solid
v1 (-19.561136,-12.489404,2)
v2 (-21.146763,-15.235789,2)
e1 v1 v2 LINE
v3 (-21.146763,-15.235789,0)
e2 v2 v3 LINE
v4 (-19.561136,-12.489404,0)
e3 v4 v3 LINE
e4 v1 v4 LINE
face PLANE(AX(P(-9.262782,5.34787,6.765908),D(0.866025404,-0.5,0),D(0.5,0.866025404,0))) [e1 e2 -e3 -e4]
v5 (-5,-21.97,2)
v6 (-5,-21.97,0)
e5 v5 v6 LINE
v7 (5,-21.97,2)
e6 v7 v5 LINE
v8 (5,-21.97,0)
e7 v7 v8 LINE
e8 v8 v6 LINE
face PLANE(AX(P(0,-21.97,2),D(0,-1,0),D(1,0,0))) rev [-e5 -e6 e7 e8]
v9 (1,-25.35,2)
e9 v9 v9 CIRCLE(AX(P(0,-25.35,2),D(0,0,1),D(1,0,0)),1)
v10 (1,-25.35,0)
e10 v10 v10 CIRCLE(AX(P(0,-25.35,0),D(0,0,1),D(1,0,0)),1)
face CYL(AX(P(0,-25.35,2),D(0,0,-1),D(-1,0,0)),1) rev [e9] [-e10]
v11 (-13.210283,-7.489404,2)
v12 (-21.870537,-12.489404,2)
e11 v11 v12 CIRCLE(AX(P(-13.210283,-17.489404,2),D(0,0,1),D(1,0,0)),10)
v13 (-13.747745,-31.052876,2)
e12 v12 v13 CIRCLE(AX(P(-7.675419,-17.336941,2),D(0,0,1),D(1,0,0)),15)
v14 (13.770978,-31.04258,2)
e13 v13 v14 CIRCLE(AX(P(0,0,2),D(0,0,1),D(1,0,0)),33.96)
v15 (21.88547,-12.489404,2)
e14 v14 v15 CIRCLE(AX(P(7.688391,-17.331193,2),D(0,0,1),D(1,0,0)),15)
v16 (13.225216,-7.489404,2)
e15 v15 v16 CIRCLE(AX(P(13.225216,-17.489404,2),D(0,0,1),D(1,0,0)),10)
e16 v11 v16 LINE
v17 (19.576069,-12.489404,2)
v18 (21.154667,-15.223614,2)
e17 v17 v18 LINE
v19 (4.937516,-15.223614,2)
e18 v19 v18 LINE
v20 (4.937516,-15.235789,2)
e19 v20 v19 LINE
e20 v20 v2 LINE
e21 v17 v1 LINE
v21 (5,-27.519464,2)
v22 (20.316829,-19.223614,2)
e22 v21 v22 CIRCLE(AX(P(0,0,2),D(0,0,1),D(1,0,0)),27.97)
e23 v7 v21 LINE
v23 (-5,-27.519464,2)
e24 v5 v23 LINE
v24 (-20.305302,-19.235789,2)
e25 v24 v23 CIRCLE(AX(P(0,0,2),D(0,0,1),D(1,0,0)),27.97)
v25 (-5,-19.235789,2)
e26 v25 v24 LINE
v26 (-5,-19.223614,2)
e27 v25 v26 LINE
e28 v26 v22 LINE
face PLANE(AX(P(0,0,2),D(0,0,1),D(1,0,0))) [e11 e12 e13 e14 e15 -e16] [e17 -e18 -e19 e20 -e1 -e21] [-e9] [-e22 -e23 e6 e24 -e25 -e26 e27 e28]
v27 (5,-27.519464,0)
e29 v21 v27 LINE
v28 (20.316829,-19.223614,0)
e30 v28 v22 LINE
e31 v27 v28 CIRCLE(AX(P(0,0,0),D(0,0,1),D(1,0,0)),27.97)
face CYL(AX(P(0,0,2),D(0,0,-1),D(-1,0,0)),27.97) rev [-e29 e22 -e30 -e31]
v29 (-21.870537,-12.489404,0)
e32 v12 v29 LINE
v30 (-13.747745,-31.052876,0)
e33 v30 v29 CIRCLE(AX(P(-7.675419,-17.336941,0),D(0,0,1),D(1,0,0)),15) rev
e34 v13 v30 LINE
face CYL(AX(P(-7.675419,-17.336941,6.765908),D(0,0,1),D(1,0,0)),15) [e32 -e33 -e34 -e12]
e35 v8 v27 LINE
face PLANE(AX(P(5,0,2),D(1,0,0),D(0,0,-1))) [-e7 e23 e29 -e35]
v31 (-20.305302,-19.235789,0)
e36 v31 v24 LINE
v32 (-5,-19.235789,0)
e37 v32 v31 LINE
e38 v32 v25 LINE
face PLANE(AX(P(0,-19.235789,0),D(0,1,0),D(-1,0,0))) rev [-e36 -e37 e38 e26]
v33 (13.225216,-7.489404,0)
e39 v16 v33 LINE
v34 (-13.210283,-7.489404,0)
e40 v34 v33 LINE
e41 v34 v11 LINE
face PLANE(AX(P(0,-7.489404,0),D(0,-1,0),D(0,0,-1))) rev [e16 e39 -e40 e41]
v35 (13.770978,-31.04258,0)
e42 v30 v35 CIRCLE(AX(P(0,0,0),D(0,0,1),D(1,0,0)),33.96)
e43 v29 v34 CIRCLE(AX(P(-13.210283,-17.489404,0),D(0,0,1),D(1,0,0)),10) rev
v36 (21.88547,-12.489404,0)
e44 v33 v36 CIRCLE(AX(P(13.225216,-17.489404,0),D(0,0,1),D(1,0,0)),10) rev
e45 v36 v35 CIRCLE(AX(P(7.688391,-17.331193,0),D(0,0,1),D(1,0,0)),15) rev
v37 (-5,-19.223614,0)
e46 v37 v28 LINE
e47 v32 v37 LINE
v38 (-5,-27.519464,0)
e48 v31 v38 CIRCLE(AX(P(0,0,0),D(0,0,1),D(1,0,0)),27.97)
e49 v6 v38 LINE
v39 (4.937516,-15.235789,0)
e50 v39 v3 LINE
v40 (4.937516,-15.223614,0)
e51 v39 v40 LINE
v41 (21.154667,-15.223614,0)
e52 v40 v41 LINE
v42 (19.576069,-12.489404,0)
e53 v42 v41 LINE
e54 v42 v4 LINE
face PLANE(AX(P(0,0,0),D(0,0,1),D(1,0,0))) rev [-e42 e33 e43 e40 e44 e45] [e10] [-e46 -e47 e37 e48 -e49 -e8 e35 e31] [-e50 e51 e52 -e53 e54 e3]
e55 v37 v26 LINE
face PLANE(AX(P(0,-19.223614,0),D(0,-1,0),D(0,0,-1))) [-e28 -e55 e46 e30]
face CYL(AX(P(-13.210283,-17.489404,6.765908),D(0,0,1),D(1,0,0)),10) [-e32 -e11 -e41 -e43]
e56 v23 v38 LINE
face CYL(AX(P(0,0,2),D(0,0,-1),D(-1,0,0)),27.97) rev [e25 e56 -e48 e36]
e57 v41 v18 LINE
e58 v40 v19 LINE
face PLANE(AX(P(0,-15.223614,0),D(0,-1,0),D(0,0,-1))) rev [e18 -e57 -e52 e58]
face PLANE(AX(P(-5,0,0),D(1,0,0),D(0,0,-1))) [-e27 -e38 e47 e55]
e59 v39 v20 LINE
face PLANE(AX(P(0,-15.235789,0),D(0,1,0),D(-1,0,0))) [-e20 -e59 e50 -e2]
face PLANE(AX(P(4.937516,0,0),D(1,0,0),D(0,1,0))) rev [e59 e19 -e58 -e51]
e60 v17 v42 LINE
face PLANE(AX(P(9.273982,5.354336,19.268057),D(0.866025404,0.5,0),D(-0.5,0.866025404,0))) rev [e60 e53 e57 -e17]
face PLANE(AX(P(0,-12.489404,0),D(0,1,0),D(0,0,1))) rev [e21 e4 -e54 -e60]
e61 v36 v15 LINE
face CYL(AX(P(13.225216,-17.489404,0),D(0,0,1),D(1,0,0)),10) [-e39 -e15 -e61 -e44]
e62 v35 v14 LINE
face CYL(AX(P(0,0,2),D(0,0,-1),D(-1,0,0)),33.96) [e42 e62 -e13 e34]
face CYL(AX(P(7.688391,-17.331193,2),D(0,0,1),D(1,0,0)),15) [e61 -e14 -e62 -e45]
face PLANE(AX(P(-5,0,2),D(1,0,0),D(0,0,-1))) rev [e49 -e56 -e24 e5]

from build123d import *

# Parameters (mm, degrees)
SKETCH1_R           = 0.9999999999999973
BOSS_EXTRUDE1_DEPTH = 2
BOSS_EXTRUDE2_DEPTH = 2
BOSS_EXTRUDE3_DEPTH = 2
BOSS_EXTRUDE4_DEPTH = 2
BOSS_EXTRUDE6_DEPTH = 2
CUT_EXTRUDE5_DEPTH  = 10
CUT_EXTRUDE6_DEPTH  = 10
FILLET3_R           = 10
FILLET4_R           = 15


with BuildPart() as part:
    # Sketch1 → Boss-Extrude1 (new body)
    with BuildSketch(Plane.XY):
        with BuildLine():
            Line((-25.026699742262835, -12.489403509000002), (-31.579999999831756, -12.489403509000002))
            ThreePointArc((-31.579999999831788, -12.489403509000118), (-4.3876e-13, -33.96), (31.579999999831465, -12.489403509000935))
            Line((31.579999999831173, -12.489403509000002), (25.026699742262835, -12.489403509000002))
            ThreePointArc((25.026699742262835, -12.489403508999999), (16.78917371704707, -22.3706179149977), (5.000000000000879, -27.51946402094327))
            Line((5.000000000000001, -27.519464020943122), (5.000000000000001, -21.97))
            Line((5.000000000000001, -21.97), (0, -21.97))
            Line((0, -21.97), (-5.000000000000001, -21.970000000000002))
            Line((-5.000000000000001, -21.970000000000002), (-5.000000000000001, -27.519464020943126))
            ThreePointArc((-5.000000000000872, -27.519464020943275), (-16.789173717047063, -22.370617914997695), (-25.02669974226283, -12.489403508999999))
        make_face()
        with Locations((2.25e-15, -25.35)):
            Circle(SKETCH1_R, mode=Mode.SUBTRACT)
    extrude(amount=BOSS_EXTRUDE1_DEPTH)

    # Sketch2 → Boss-Extrude2 (add)
    with BuildSketch(Plane.XY.offset(2)):
        with BuildLine():
            Line((-31.57999999983184, -12.489403509000002), (-25.026699742262828, -12.489403509000002))
            Line((-25.026699742262828, -12.489403509000002), (0, -12.489403509000002))
            Line((0, -12.489403509000002), (25.026699742262828, -12.489403509000002))
            Line((25.026699742262828, -12.489403509000002), (31.57999999983184, -12.489403509000002))
            ThreePointArc((31.57999999983184, -12.489403509000002), (30.972585231224635, -9.734010611787788), (29.262941504232284, -7.489403509000002))
            Line((29.262941504232288, -7.489403509000003), (-29.262941504232284, -7.489403509000003))
            ThreePointArc((-29.262941504232284, -7.489403509000002), (-30.972585231224635, -9.734010611787788), (-31.57999999983184, -12.489403509000002))
        make_face()
    extrude(amount=-BOSS_EXTRUDE2_DEPTH)

    # Sketch3 → Boss-Extrude3 (add)
    with BuildSketch(Plane.XY.offset(2)):
        Polygon((-24.813781653352383, -19.23578932070869), (-5, -19.235789320708687), (-5.000000000000001, -19.223614188291315), (25.52831463289919, -19.223614188291315), (25.52831463289919, -15.223614188291313), (4.937516262759692, -15.223614188291313), (4.937516262759691, -15.235789320708687), (-24.813781653352386, -15.235789320708694), align=None)
    extrude(amount=-BOSS_EXTRUDE3_DEPTH)

    # Sketch4 → Boss-Extrude4 (add)
    with BuildSketch(Plane.XY):
        Polygon((26.752232503098107, -20.918882764148314), (23.464067657719866, -15.223614188291315), (21.15466658096137, -15.223614188291313), (25.020181695529228, -21.918882764148307), align=None)
        Polygon((21.15466658096137, -15.223614188291313), (23.464067657719863, -15.223614188291313), (18.99871904006177, -7.489403509000002), (17.266668232492894, -8.489403508999997), align=None)
    extrude(amount=BOSS_EXTRUDE4_DEPTH)

    # Sketch6 → Boss-Extrude6 (add)
    with BuildSketch(Plane(origin=(0, 0, 0), x_dir=(-1, 0, 0), z_dir=(0, 0, -1))):
        Polygon((21.146762799182063, -15.235789320708694), (23.45616387594056, -15.235789320708694), (22.962540836382626, -14.38080913640776), (21.870537288251985, -12.489403509), (19.561136211493483, -12.489403509000002), align=None)
    extrude(amount=-BOSS_EXTRUDE6_DEPTH)

    # Sketch7 → Cut-Extrude5 (cut)
    with BuildSketch(Plane(origin=(0, 0, 0), x_dir=(-1, 0, 0), z_dir=(0, 0, -1))):
        with BuildLine():
            Line((23.456163875940437, -15.235789320708776), (26.743640561861312, -20.92986596942182))
            ThreePointArc((26.743640561861444, -20.929865969421787), (29.465608999795766, -16.88370475550775), (31.579999999831838, -12.489403509000006))
            ThreePointArc((31.579999999831834, -12.489403508999994), (30.972585231224627, -9.734010611787786), (29.262941504232284, -7.489403509000004))
            Line((29.262941504232284, -7.489403509000003), (18.983785942303626, -7.489403509000003))
            Line((18.98378594230363, -7.4894035090000095), (21.87053728825184, -12.489403509000091))
            Line((21.87053728825199, -12.489403509000002), (25.026699742262828, -12.489403509000002))
            ThreePointArc((25.02669974226283, -12.489403509000006), (24.280293962635962, -13.884819951586834), (23.456163875940568, -15.235789320708696))
        make_face()
    extrude(amount=-CUT_EXTRUDE5_DEPTH, mode=Mode.SUBTRACT)

    # Sketch8 → Cut-Extrude6 (cut)
    with BuildSketch(Plane(origin=(0, 0, 0), x_dir=(-1, 0, 0), z_dir=(0, 0, -1))):
        with BuildLine():
            Line((-26.752232503097716, -20.918882764147654), (-23.464067657719863, -15.223614188291315))
            ThreePointArc((-23.46406765771987, -15.223614188291315), (-24.283896058283027, -13.878519093567089), (-25.026699742262828, -12.489403509000002))
            Line((-25.026699742262828, -12.489403509000002), (-21.88547038600989, -12.489403509000002))
            Line((-21.88547038600989, -12.489403509000002), (-18.998719040061772, -7.4894035090000015))
            Line((-18.998719040061772, -7.489403509000003), (-29.262941504232288, -7.489403509000003))
            ThreePointArc((-29.262941504232284, -7.489403509000002), (-30.97258523122463, -9.73401061178779), (-31.57999999983184, -12.489403509000002))
            ThreePointArc((-31.57999999983184, -12.489403509000002), (-29.469074761896252, -16.877654833470505), (-26.75223250309883, -20.9188827641474))
        make_face()
    extrude(amount=-CUT_EXTRUDE6_DEPTH, mode=Mode.SUBTRACT)

    # Fillet3
    fillet3_edges = [part.edges().sort_by_distance(p)[0] for p in [
        (-18.983785942303626, -7.489403509000006, 1),
        (18.998719040061772, -7.489403509000002, 1),
    ]]
    fillet(fillet3_edges, radius=FILLET3_R)

    # Fillet4
    # the kernel refuses this fillet: 15 mm, written as the material it takes off along each edge
    with BuildSketch(Plane(origin=(26.752232503098277, -20.91888276414753, -41.15536178864485), x_dir=(-0.5000000000000459, 0.8660254037844121, 0), z_dir=(0, 0, 1))) as fillet4_piece_1:
        with BuildLine():
            CenterArc((12.63895144979885, 14.71592649800607), FILLET4_R, 173.92282911126543, 84.90866305824733)
            ThreePointArc((-2.2767516311276927, 16.30394463443854), (-2.1412465863768713, 8.011927210685023), (0, 0))
            Line((0, 0), (9.73352423417586, 7.4e-16))
        make_face()
    extrude(amount=84.3107235772897, mode=Mode.SUBTRACT)
    with BuildSketch(Plane(origin=(-26.743640561861376, -20.929865969421805, -41.183176669180206), x_dir=(0.7889080559016987, -0.6145112524058467, 0), z_dir=(0, 0, 1))) as fillet4_piece_2:
        with BuildLine():
            CenterArc((12.835180855907009, 14.552123643012767), FILLET4_R, 199.06172243650428, 84.97473929921648)
            Line((-1.342328727646797, 9.653325626331542), (0, 0))
            ThreePointArc((0, 0), (8.236635333836043, -1.0139920722190925), (16.473270667672082, 5.9e-16))
        make_face()
    extrude(amount=84.36635333836041, mode=Mode.SUBTRACT)


solid = part.part
